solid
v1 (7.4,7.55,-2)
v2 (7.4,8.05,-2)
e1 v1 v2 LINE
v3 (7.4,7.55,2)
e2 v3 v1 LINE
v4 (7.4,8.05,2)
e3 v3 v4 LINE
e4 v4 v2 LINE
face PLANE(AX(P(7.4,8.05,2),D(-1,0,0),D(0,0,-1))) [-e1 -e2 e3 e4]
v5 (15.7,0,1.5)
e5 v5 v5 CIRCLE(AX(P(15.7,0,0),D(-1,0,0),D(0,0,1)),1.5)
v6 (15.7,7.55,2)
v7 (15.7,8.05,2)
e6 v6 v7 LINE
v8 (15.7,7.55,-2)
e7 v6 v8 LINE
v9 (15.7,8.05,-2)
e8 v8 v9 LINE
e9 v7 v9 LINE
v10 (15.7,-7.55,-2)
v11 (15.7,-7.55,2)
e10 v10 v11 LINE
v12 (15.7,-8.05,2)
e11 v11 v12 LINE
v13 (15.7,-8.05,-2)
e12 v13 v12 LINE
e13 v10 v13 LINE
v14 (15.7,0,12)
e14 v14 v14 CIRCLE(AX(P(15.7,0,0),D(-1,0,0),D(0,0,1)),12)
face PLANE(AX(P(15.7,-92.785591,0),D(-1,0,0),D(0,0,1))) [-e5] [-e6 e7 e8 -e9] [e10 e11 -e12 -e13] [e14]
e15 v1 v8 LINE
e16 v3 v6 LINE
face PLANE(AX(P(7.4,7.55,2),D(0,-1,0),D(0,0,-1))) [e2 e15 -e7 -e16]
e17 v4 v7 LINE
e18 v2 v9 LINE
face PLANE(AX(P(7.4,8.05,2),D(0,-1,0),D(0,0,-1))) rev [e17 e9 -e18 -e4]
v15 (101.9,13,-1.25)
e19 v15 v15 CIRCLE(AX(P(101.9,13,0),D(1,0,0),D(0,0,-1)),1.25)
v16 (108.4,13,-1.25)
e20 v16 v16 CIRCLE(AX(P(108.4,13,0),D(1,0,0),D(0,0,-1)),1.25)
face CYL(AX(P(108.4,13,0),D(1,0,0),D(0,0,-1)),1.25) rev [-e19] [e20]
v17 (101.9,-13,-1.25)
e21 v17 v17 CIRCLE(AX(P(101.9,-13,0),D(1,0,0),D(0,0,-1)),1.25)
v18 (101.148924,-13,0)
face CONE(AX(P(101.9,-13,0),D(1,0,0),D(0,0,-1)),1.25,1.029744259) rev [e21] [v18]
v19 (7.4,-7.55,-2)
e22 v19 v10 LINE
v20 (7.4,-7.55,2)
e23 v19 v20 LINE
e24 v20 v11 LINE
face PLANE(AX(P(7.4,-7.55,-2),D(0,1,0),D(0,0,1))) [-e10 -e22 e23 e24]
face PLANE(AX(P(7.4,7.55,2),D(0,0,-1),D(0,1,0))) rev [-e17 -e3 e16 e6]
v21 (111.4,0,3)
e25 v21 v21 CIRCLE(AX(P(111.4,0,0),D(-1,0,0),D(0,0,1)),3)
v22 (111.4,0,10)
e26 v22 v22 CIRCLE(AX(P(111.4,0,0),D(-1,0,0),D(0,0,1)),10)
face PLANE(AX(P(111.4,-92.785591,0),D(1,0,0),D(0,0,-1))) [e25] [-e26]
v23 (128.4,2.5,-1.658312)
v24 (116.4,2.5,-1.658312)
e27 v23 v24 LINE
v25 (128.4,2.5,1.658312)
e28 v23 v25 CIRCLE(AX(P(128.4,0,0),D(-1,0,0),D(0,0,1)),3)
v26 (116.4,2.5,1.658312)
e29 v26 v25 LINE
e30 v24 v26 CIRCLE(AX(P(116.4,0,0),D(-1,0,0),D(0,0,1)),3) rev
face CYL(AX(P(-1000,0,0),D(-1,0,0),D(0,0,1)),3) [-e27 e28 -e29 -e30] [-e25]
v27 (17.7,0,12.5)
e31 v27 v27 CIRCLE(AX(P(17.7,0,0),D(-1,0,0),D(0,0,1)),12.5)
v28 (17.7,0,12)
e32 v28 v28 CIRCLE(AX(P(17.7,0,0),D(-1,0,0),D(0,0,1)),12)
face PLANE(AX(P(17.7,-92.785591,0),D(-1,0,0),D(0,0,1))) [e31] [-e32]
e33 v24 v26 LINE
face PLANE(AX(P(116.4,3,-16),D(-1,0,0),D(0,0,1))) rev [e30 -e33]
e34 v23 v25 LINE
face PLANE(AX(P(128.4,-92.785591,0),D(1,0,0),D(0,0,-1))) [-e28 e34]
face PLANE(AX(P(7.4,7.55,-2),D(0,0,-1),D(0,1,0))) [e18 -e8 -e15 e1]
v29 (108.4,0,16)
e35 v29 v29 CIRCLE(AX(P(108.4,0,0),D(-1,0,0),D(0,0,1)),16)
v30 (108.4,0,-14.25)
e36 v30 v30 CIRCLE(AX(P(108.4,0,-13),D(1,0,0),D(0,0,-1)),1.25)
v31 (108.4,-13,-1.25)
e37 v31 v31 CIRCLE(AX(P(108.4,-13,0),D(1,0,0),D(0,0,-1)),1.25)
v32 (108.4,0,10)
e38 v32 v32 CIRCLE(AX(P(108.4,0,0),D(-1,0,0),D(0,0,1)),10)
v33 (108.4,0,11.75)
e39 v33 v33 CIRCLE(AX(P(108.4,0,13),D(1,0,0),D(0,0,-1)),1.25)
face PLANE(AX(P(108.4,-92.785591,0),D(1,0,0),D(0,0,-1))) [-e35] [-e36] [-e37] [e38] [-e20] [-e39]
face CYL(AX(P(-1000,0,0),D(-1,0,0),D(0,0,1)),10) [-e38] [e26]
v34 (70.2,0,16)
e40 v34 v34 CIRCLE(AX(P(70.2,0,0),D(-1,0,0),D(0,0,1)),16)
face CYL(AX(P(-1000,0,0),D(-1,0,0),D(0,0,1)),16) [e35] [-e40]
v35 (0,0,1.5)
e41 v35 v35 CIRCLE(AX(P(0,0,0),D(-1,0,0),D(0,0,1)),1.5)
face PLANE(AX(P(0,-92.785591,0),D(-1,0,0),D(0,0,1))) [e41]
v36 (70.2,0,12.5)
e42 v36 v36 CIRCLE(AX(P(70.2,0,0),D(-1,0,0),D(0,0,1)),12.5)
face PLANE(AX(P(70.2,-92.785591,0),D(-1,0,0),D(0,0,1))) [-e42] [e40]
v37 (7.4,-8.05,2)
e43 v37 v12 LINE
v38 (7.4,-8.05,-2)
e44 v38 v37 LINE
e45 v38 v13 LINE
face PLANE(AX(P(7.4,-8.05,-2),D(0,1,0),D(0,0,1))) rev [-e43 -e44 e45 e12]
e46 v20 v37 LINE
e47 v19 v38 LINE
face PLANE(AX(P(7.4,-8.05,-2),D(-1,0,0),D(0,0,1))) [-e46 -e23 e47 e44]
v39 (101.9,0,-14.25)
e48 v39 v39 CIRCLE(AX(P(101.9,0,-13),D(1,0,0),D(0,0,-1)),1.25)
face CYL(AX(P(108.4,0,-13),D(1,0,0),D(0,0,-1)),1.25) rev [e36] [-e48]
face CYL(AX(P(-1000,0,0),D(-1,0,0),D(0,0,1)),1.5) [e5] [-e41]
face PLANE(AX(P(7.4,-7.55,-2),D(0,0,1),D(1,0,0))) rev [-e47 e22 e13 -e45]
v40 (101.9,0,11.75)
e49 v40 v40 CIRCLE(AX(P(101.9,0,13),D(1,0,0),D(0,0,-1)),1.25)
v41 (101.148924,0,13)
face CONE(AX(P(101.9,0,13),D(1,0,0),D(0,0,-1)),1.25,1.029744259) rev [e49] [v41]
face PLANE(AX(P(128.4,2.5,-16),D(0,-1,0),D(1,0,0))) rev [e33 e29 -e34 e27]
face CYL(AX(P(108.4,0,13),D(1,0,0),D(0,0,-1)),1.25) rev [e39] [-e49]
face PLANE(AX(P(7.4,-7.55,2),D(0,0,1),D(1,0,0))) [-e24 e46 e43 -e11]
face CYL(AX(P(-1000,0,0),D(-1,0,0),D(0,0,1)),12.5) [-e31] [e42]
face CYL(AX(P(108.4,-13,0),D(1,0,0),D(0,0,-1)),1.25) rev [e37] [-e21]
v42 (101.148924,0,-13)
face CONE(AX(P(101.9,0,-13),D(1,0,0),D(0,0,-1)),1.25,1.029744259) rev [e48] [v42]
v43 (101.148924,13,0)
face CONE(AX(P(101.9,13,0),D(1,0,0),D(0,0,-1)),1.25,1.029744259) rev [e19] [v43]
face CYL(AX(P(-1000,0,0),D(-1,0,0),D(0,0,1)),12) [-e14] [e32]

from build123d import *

# Parameters (mm, degrees)
ESQUISSE2_W                  = 4
ESQUISSE2_H                  = 0.5
EXTRUSION1_DEPTH             = 8.3
R_P_TITION_CIRCULAIRE1_COUNT = 2
ENL_V_MAT_EXTRU_1_DEPTH      = 131.378525839
ENL_V_MAT_EXTRU_1_DEPTH_BACK = 131.378525839
ESQUISSE3_W                  = 12
ESQUISSE3_H                  = 0.5


# Read off the part's stored shape, not the designer's step: Répétition circulaire2
with BuildPart() as part:
    # Esquisse1 → Révolution1 (revolve)
    with BuildSketch(Plane.XY, mode=Mode.PRIVATE) as r_volution1_sk:
        Polygon((0, 0), (0, 1.5), (15.7, 1.5), (15.7, 12), (17.7, 12), (17.7, 12.5), (70.2, 12.5), (70.2, 16), (108.4, 16), (108.4, 10), (111.4, 10), (111.4, 3), (128.4, 3), (128.4, 0), align=None)
    revolve(r_volution1_sk.sketch.rotate(Axis((-1000, 0, 0), (1, 0, 0)), 90), axis=Axis((-1000, 0, 0), (1, 0, 0)))

    # Esquisse2 → Extrusion1 (add)
    with BuildSketch(Plane.ZY.offset(-15.7)):
        with Locations((0, -7.8)):
            Rectangle(ESQUISSE2_W, ESQUISSE2_H)
    extrusion1 = extrude(amount=EXTRUSION1_DEPTH)

    # Répétition circulaire1: Extrusion1 ×2 about axis
    r_p_tition_circulaire1_axis = Axis((0, 0, 0), (1, 0, 0))
    for i in range(1, R_P_TITION_CIRCULAIRE1_COUNT):
        add(extrusion1.rotate(r_p_tition_circulaire1_axis, i * 360 / R_P_TITION_CIRCULAIRE1_COUNT))

    # Esquisse3 → Enlèv. mat.-Extru.1 (cut, two sides: drawn at the far end of the back side and taken through both)
    with BuildSketch(Plane.XY.offset(-ENL_V_MAT_EXTRU_1_DEPTH_BACK)):
        with Locations((122.4, 2.75)):
            Rectangle(ESQUISSE3_W, ESQUISSE3_H)
    extrude(amount=ENL_V_MAT_EXTRU_1_DEPTH + ENL_V_MAT_EXTRU_1_DEPTH_BACK, mode=Mode.SUBTRACT)

    # Esquisse5 → Trou taraudé M3x0.51 (revolve, cut)
    with BuildSketch(Plane(origin=(108.4, 13, 0), x_dir=(0, 0, -1), z_dir=(0, 1, 0))):
        Polygon((0, 0), (0, 7.251075774), (1.25, 6.5), (1.25, 0), align=None)
    revolve(axis=Axis((114.75, 13, 0), (-1, 0, 0)), mode=Mode.SUBTRACT)

    # Répétition circulaire2 outline → Répétition circulaire2 (revolve, cut)
    with BuildSketch(Plane.YX.offset(13)):
        Polygon((0, 101.148924226), (1.25, 101.9), (1.25, 108.4), (0, 108.4), align=None)
    revolve(axis=Axis((0, 0, -13), (1, 0, 0)), mode=Mode.SUBTRACT)

    # R_p_tition circulaire2 2 outline → R_p_tition circulaire2 2 (revolve, cut)
    with BuildSketch(Plane(origin=(0, -13, 0), x_dir=(0, 1, 0), z_dir=(0, 0, -1))):
        Polygon((0, 101.148924226), (1.25, 101.9), (1.25, 108.4), (0, 108.4), align=None)
    revolve(axis=Axis((0, -13, 0), (1, 0, 0)), mode=Mode.SUBTRACT)

    # R_p_tition circulaire2 3 outline → R_p_tition circulaire2 3 (revolve, cut)
    with BuildSketch(Plane.YX.offset(-13)):
        Polygon((0, 101.148924226), (1.25, 101.9), (1.25, 108.4), (0, 108.4), align=None)
    revolve(axis=Axis((0, 0, 13), (1, 0, 0)), mode=Mode.SUBTRACT)


solid = part.part
